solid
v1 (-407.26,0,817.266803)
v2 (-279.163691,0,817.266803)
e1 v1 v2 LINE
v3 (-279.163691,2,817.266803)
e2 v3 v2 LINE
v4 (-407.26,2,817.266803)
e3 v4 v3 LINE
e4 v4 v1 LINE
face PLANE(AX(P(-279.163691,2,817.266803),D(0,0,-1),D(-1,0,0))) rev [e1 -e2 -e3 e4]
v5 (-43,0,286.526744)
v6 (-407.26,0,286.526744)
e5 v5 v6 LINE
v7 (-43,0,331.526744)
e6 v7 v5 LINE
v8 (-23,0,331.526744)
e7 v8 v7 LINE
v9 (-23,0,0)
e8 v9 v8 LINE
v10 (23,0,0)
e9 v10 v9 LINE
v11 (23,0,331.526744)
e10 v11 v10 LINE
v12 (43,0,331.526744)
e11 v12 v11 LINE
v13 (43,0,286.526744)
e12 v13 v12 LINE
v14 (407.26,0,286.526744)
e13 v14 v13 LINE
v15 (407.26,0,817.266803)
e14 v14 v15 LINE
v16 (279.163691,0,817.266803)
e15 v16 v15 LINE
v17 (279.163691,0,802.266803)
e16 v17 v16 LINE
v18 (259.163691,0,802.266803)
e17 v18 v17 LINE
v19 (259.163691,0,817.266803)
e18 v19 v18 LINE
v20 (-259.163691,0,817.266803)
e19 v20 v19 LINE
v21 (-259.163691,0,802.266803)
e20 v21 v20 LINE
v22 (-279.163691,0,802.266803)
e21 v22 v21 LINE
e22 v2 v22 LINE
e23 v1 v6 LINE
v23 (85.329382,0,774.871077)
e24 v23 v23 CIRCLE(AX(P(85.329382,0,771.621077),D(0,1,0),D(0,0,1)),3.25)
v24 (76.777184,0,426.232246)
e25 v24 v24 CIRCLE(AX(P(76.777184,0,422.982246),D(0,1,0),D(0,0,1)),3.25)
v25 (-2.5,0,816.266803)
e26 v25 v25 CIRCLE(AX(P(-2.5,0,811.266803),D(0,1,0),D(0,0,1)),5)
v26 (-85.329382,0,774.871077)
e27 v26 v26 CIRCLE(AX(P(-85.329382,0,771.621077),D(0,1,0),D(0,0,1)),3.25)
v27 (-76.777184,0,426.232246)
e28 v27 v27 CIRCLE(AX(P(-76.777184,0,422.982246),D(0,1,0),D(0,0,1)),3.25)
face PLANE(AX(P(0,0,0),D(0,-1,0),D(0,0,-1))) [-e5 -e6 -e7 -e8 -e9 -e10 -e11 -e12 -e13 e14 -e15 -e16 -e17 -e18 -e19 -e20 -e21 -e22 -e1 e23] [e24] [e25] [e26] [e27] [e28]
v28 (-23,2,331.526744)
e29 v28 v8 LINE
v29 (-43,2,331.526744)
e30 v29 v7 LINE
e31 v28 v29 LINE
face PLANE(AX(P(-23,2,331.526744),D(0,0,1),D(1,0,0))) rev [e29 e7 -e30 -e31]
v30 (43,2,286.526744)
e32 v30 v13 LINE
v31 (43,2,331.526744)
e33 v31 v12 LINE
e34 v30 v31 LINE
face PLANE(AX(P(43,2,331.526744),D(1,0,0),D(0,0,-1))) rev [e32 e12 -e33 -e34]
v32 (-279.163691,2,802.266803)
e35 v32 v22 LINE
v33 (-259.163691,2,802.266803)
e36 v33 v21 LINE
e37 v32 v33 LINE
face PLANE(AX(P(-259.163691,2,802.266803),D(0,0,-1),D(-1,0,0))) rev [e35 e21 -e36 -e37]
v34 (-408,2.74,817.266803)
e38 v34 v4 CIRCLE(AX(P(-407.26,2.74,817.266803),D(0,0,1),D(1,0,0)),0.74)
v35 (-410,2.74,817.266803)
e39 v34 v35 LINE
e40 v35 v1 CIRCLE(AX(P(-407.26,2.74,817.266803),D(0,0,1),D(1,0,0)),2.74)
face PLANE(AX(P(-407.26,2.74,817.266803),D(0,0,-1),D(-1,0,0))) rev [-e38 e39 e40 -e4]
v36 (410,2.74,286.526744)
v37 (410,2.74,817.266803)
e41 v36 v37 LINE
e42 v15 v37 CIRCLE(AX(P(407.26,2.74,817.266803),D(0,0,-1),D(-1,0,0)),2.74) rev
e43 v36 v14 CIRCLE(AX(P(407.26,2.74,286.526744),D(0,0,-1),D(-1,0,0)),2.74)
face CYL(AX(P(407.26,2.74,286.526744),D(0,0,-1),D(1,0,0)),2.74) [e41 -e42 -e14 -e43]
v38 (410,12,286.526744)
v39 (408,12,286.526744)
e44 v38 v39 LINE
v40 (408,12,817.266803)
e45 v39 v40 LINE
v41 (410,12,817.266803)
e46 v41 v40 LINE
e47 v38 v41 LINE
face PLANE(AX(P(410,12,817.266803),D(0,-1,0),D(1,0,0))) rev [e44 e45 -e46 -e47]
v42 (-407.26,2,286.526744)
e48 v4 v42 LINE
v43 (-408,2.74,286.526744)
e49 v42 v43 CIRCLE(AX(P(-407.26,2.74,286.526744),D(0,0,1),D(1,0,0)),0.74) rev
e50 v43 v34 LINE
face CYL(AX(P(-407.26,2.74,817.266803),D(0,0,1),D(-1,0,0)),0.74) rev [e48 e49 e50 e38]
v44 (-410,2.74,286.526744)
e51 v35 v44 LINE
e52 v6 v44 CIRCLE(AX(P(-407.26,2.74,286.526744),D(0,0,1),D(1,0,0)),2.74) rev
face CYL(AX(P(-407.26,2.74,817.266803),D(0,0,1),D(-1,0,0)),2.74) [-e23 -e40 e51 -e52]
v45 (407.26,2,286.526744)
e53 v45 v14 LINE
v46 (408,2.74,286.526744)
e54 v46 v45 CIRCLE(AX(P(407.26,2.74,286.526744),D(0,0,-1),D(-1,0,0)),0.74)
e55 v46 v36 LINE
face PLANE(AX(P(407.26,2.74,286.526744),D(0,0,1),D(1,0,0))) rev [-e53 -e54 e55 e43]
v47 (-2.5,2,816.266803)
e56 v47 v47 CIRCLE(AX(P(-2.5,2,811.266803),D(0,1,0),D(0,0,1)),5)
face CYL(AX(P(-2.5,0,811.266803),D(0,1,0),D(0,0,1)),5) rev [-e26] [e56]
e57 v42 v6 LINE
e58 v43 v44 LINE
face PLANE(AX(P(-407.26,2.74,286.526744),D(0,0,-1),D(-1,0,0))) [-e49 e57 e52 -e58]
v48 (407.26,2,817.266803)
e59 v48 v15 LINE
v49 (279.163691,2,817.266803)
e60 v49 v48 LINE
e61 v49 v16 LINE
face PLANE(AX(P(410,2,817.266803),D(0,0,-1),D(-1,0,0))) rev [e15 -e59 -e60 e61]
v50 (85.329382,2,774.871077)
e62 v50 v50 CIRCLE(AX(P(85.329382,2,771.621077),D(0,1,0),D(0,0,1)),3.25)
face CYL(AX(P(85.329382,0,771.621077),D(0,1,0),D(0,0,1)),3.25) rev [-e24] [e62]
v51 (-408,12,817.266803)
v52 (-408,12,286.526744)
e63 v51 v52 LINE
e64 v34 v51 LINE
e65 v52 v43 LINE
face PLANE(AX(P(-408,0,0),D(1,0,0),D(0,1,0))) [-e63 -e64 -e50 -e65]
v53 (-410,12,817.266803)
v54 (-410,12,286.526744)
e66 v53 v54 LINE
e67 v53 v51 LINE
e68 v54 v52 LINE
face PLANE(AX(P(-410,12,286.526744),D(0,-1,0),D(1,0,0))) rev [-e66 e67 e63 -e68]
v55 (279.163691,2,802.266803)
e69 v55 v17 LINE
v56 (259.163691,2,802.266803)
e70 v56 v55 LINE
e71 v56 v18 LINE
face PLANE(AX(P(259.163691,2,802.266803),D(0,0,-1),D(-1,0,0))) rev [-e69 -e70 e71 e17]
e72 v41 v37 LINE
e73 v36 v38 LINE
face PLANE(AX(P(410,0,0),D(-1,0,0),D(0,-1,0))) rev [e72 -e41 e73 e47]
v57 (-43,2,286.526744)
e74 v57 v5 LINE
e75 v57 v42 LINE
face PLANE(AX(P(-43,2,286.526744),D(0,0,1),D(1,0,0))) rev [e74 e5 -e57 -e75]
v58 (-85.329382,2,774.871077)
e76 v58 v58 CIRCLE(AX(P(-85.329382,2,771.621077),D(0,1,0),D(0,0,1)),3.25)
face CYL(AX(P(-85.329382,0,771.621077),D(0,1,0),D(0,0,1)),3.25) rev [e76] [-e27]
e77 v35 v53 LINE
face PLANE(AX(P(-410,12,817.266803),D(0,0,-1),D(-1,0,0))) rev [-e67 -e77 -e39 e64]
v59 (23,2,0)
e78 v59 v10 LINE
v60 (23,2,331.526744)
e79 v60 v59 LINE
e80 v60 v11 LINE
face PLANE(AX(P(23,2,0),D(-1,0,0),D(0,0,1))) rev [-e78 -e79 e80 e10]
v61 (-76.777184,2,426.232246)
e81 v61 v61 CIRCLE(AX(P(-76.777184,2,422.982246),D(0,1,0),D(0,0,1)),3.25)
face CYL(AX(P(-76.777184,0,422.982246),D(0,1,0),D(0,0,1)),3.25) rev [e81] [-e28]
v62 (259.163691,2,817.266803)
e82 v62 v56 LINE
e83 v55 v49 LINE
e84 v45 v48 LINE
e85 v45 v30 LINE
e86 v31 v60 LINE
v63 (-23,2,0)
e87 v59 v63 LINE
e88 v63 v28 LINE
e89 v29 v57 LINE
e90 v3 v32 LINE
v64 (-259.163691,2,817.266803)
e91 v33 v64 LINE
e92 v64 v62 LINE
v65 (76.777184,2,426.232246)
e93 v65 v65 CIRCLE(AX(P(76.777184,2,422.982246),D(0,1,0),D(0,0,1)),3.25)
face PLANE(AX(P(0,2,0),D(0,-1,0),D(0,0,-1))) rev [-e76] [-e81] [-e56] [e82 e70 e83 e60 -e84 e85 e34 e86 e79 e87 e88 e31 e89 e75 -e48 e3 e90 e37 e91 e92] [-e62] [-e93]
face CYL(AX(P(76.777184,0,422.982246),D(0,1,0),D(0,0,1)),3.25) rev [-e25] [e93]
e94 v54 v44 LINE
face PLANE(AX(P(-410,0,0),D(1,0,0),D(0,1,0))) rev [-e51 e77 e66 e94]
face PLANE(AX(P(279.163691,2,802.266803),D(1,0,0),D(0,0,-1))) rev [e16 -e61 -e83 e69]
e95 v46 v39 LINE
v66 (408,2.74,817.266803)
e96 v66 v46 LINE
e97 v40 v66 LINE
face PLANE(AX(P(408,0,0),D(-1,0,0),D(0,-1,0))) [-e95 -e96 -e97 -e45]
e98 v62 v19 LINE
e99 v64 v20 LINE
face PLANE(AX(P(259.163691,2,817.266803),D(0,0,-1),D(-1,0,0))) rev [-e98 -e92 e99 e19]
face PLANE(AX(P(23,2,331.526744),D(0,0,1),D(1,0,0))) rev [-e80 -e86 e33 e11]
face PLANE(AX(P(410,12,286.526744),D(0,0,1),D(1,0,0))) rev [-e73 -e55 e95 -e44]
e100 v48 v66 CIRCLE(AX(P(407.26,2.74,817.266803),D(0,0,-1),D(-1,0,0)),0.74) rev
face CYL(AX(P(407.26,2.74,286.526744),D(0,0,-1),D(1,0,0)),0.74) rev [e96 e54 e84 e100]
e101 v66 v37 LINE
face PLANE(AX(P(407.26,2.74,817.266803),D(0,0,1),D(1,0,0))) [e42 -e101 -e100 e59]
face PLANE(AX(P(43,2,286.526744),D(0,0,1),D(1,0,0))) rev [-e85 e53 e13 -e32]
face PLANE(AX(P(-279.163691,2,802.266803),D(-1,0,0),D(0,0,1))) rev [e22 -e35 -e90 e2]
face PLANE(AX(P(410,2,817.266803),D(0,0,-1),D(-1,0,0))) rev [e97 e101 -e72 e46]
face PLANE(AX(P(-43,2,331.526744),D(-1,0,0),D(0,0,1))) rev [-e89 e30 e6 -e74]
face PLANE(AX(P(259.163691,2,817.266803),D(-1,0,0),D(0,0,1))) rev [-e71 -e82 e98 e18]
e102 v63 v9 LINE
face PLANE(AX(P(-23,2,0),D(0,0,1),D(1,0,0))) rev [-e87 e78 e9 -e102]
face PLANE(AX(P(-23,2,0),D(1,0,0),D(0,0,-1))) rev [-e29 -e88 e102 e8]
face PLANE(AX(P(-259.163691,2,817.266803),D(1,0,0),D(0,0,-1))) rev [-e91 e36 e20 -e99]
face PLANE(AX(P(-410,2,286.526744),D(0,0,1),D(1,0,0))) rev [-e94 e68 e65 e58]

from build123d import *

# Parameters (mm, degrees)
SM_BASE_FLANGE_1_DEPTH             = 2
SM_EDGE_FLANGE_1_STRIP_W           = 9.48
SM_EDGE_FLANGE_1_STRIP_H           = 2
SM_EDGE_FLANGE_1_STRIP_CUT_DEPTH   = 530.740059044
SM_EDGE_FLANGE_1_STRIP_2_W         = 9.48
SM_EDGE_FLANGE_1_STRIP_2_H         = 2
SM_EDGE_FLANGE_1_STRIP_CUT_2_DEPTH = 530.740059044
SM_EDGE_FLANGE_1_DEPTH             = 530.740059044
SM_EDGE_FLANGE_1_BEND_DEPTH        = 530.740059044
SKETCH_12_R                        = 5
CUT_EXTRUDE_1_DEPTH                = 3
SKETCH_13_R                        = 3.25
CUT_EXTRUDE_2_DEPTH                = 5


# Read off the part's stored shape, not the designer's step: Базовая кромка1
# Sheet-metal steps are written as plain solids
with BuildPart() as part:
    # Базовая кромка1 outline → Базовая кромка1 (new body)
    with BuildSketch(Plane(origin=(0, 0, 0), x_dir=(1, 0, 0), z_dir=(0, 1, 0))):
        Polygon((-23, -331.526743508), (-43, -331.526743508), (-43, -286.526743508), (-410, -286.526743508), (-410, -817.266802552), (-279.163690552, -817.266802552), (-279.163690552, -802.266802552), (-259.163690552, -802.266802552), (-259.163690552, -817.266802552), (259.163690552, -817.266802552), (259.163690552, -802.266802552), (279.163690552, -802.266802552), (279.163690552, -817.266802552), (410, -817.266802552), (410, -286.526743508), (43, -286.526743508), (43, -331.526743508), (23, -331.526743508), (23, 0), (-23, 0), align=None)
    extrude(amount=SM_BASE_FLANGE_1_DEPTH)

    # Ребро-кромка1 strip (across the edge) → Ребро-кромка1 strip cut (cut)
    with BuildSketch(Plane(origin=(410, 2, 817.266802552), x_dir=(-1, 0, 0), z_dir=(0, 0, -1))):
        with Locations((-2, -1)):
            Rectangle(SM_EDGE_FLANGE_1_STRIP_W, SM_EDGE_FLANGE_1_STRIP_H)
    extrude(amount=SM_EDGE_FLANGE_1_STRIP_CUT_DEPTH, mode=Mode.SUBTRACT)

    # Ребро-кромка1 strip 2 (across the edge) → Ребро-кромка1 strip cut 2 (cut)
    with BuildSketch(Plane(origin=(-410, 2, 286.526743508), x_dir=(1, 0, 0), z_dir=(0, 0, 1))):
        with Locations((-2, -1)):
            Rectangle(SM_EDGE_FLANGE_1_STRIP_2_W, SM_EDGE_FLANGE_1_STRIP_2_H)
    extrude(amount=SM_EDGE_FLANGE_1_STRIP_CUT_2_DEPTH, mode=Mode.SUBTRACT)

    # Ребро-кромка1 section (across the edge) → Ребро-кромка1 (add)
    with BuildSketch(Plane(origin=(410, 2, 817.266802552), x_dir=(-1, 0, 0), z_dir=(0, 0, -1))):
        with BuildLine():
            Line((0, 0.74), (0, 10))
            Line((0, 10), (2, 10))
            Line((2, 10), (2, 0.74))
            ThreePointArc((2, 0.74), (2.216740982, 0.216740982), (2.74, 0))
            Line((2.74, 0), (2.74, -2))
            ThreePointArc((2.74, -2), (0.80252742, -1.19747258), (0, 0.74))
        make_face()
    extrude(amount=SM_EDGE_FLANGE_1_DEPTH)

    # Ребро-кромка1 section 2 (across the edge) → Ребро-кромка1 bend (add)
    with BuildSketch(Plane(origin=(-410, 2, 286.526743508), x_dir=(1, 0, 0), z_dir=(0, 0, 1))):
        with BuildLine():
            Line((0, 0.74), (0, 10))
            Line((0, 10), (2, 10))
            Line((2, 10), (2, 0.74))
            ThreePointArc((2, 0.74), (2.216740982, 0.216740982), (2.74, 0))
            Line((2.74, 0), (2.74, -2))
            ThreePointArc((2.74, -2), (0.80252742, -1.19747258), (0, 0.74))
        make_face()
    extrude(amount=SM_EDGE_FLANGE_1_BEND_DEPTH)

    # Эскиз12 → Вырез-Вытянуть1 (cut)
    with BuildSketch(Plane(origin=(0, 2, 0), x_dir=(1, 0, 0), z_dir=(0, 1, 0))):
        with Locations(Location((-2.5, -811.266802552, 0), (0, 0, 270))):
            Circle(SKETCH_12_R)
    extrude(amount=-CUT_EXTRUDE_1_DEPTH, mode=Mode.SUBTRACT)

    # Эскиз13 → Вырез-Вытянуть2 (cut)
    with BuildSketch(Plane(origin=(0, 2, 0), x_dir=(1, 0, 0), z_dir=(0, 1, 0))):
        with Locations(Location((76.777184185, -422.982246008, 0), (0, 0, 270))):
            Circle(SKETCH_13_R)
        with Locations(Location((85.329382087, -771.621076737, 0), (0, 0, 270))):
            Circle(SKETCH_13_R)
        with Locations(Location((-85.329382087, -771.621076737, 0), (0, 0, 270))):
            Circle(SKETCH_13_R)
        with Locations(Location((-76.777184185, -422.982246008, 0), (0, 0, 270))):
            Circle(SKETCH_13_R)
    extrude(amount=-CUT_EXTRUDE_2_DEPTH, mode=Mode.SUBTRACT)


solid = part.part
